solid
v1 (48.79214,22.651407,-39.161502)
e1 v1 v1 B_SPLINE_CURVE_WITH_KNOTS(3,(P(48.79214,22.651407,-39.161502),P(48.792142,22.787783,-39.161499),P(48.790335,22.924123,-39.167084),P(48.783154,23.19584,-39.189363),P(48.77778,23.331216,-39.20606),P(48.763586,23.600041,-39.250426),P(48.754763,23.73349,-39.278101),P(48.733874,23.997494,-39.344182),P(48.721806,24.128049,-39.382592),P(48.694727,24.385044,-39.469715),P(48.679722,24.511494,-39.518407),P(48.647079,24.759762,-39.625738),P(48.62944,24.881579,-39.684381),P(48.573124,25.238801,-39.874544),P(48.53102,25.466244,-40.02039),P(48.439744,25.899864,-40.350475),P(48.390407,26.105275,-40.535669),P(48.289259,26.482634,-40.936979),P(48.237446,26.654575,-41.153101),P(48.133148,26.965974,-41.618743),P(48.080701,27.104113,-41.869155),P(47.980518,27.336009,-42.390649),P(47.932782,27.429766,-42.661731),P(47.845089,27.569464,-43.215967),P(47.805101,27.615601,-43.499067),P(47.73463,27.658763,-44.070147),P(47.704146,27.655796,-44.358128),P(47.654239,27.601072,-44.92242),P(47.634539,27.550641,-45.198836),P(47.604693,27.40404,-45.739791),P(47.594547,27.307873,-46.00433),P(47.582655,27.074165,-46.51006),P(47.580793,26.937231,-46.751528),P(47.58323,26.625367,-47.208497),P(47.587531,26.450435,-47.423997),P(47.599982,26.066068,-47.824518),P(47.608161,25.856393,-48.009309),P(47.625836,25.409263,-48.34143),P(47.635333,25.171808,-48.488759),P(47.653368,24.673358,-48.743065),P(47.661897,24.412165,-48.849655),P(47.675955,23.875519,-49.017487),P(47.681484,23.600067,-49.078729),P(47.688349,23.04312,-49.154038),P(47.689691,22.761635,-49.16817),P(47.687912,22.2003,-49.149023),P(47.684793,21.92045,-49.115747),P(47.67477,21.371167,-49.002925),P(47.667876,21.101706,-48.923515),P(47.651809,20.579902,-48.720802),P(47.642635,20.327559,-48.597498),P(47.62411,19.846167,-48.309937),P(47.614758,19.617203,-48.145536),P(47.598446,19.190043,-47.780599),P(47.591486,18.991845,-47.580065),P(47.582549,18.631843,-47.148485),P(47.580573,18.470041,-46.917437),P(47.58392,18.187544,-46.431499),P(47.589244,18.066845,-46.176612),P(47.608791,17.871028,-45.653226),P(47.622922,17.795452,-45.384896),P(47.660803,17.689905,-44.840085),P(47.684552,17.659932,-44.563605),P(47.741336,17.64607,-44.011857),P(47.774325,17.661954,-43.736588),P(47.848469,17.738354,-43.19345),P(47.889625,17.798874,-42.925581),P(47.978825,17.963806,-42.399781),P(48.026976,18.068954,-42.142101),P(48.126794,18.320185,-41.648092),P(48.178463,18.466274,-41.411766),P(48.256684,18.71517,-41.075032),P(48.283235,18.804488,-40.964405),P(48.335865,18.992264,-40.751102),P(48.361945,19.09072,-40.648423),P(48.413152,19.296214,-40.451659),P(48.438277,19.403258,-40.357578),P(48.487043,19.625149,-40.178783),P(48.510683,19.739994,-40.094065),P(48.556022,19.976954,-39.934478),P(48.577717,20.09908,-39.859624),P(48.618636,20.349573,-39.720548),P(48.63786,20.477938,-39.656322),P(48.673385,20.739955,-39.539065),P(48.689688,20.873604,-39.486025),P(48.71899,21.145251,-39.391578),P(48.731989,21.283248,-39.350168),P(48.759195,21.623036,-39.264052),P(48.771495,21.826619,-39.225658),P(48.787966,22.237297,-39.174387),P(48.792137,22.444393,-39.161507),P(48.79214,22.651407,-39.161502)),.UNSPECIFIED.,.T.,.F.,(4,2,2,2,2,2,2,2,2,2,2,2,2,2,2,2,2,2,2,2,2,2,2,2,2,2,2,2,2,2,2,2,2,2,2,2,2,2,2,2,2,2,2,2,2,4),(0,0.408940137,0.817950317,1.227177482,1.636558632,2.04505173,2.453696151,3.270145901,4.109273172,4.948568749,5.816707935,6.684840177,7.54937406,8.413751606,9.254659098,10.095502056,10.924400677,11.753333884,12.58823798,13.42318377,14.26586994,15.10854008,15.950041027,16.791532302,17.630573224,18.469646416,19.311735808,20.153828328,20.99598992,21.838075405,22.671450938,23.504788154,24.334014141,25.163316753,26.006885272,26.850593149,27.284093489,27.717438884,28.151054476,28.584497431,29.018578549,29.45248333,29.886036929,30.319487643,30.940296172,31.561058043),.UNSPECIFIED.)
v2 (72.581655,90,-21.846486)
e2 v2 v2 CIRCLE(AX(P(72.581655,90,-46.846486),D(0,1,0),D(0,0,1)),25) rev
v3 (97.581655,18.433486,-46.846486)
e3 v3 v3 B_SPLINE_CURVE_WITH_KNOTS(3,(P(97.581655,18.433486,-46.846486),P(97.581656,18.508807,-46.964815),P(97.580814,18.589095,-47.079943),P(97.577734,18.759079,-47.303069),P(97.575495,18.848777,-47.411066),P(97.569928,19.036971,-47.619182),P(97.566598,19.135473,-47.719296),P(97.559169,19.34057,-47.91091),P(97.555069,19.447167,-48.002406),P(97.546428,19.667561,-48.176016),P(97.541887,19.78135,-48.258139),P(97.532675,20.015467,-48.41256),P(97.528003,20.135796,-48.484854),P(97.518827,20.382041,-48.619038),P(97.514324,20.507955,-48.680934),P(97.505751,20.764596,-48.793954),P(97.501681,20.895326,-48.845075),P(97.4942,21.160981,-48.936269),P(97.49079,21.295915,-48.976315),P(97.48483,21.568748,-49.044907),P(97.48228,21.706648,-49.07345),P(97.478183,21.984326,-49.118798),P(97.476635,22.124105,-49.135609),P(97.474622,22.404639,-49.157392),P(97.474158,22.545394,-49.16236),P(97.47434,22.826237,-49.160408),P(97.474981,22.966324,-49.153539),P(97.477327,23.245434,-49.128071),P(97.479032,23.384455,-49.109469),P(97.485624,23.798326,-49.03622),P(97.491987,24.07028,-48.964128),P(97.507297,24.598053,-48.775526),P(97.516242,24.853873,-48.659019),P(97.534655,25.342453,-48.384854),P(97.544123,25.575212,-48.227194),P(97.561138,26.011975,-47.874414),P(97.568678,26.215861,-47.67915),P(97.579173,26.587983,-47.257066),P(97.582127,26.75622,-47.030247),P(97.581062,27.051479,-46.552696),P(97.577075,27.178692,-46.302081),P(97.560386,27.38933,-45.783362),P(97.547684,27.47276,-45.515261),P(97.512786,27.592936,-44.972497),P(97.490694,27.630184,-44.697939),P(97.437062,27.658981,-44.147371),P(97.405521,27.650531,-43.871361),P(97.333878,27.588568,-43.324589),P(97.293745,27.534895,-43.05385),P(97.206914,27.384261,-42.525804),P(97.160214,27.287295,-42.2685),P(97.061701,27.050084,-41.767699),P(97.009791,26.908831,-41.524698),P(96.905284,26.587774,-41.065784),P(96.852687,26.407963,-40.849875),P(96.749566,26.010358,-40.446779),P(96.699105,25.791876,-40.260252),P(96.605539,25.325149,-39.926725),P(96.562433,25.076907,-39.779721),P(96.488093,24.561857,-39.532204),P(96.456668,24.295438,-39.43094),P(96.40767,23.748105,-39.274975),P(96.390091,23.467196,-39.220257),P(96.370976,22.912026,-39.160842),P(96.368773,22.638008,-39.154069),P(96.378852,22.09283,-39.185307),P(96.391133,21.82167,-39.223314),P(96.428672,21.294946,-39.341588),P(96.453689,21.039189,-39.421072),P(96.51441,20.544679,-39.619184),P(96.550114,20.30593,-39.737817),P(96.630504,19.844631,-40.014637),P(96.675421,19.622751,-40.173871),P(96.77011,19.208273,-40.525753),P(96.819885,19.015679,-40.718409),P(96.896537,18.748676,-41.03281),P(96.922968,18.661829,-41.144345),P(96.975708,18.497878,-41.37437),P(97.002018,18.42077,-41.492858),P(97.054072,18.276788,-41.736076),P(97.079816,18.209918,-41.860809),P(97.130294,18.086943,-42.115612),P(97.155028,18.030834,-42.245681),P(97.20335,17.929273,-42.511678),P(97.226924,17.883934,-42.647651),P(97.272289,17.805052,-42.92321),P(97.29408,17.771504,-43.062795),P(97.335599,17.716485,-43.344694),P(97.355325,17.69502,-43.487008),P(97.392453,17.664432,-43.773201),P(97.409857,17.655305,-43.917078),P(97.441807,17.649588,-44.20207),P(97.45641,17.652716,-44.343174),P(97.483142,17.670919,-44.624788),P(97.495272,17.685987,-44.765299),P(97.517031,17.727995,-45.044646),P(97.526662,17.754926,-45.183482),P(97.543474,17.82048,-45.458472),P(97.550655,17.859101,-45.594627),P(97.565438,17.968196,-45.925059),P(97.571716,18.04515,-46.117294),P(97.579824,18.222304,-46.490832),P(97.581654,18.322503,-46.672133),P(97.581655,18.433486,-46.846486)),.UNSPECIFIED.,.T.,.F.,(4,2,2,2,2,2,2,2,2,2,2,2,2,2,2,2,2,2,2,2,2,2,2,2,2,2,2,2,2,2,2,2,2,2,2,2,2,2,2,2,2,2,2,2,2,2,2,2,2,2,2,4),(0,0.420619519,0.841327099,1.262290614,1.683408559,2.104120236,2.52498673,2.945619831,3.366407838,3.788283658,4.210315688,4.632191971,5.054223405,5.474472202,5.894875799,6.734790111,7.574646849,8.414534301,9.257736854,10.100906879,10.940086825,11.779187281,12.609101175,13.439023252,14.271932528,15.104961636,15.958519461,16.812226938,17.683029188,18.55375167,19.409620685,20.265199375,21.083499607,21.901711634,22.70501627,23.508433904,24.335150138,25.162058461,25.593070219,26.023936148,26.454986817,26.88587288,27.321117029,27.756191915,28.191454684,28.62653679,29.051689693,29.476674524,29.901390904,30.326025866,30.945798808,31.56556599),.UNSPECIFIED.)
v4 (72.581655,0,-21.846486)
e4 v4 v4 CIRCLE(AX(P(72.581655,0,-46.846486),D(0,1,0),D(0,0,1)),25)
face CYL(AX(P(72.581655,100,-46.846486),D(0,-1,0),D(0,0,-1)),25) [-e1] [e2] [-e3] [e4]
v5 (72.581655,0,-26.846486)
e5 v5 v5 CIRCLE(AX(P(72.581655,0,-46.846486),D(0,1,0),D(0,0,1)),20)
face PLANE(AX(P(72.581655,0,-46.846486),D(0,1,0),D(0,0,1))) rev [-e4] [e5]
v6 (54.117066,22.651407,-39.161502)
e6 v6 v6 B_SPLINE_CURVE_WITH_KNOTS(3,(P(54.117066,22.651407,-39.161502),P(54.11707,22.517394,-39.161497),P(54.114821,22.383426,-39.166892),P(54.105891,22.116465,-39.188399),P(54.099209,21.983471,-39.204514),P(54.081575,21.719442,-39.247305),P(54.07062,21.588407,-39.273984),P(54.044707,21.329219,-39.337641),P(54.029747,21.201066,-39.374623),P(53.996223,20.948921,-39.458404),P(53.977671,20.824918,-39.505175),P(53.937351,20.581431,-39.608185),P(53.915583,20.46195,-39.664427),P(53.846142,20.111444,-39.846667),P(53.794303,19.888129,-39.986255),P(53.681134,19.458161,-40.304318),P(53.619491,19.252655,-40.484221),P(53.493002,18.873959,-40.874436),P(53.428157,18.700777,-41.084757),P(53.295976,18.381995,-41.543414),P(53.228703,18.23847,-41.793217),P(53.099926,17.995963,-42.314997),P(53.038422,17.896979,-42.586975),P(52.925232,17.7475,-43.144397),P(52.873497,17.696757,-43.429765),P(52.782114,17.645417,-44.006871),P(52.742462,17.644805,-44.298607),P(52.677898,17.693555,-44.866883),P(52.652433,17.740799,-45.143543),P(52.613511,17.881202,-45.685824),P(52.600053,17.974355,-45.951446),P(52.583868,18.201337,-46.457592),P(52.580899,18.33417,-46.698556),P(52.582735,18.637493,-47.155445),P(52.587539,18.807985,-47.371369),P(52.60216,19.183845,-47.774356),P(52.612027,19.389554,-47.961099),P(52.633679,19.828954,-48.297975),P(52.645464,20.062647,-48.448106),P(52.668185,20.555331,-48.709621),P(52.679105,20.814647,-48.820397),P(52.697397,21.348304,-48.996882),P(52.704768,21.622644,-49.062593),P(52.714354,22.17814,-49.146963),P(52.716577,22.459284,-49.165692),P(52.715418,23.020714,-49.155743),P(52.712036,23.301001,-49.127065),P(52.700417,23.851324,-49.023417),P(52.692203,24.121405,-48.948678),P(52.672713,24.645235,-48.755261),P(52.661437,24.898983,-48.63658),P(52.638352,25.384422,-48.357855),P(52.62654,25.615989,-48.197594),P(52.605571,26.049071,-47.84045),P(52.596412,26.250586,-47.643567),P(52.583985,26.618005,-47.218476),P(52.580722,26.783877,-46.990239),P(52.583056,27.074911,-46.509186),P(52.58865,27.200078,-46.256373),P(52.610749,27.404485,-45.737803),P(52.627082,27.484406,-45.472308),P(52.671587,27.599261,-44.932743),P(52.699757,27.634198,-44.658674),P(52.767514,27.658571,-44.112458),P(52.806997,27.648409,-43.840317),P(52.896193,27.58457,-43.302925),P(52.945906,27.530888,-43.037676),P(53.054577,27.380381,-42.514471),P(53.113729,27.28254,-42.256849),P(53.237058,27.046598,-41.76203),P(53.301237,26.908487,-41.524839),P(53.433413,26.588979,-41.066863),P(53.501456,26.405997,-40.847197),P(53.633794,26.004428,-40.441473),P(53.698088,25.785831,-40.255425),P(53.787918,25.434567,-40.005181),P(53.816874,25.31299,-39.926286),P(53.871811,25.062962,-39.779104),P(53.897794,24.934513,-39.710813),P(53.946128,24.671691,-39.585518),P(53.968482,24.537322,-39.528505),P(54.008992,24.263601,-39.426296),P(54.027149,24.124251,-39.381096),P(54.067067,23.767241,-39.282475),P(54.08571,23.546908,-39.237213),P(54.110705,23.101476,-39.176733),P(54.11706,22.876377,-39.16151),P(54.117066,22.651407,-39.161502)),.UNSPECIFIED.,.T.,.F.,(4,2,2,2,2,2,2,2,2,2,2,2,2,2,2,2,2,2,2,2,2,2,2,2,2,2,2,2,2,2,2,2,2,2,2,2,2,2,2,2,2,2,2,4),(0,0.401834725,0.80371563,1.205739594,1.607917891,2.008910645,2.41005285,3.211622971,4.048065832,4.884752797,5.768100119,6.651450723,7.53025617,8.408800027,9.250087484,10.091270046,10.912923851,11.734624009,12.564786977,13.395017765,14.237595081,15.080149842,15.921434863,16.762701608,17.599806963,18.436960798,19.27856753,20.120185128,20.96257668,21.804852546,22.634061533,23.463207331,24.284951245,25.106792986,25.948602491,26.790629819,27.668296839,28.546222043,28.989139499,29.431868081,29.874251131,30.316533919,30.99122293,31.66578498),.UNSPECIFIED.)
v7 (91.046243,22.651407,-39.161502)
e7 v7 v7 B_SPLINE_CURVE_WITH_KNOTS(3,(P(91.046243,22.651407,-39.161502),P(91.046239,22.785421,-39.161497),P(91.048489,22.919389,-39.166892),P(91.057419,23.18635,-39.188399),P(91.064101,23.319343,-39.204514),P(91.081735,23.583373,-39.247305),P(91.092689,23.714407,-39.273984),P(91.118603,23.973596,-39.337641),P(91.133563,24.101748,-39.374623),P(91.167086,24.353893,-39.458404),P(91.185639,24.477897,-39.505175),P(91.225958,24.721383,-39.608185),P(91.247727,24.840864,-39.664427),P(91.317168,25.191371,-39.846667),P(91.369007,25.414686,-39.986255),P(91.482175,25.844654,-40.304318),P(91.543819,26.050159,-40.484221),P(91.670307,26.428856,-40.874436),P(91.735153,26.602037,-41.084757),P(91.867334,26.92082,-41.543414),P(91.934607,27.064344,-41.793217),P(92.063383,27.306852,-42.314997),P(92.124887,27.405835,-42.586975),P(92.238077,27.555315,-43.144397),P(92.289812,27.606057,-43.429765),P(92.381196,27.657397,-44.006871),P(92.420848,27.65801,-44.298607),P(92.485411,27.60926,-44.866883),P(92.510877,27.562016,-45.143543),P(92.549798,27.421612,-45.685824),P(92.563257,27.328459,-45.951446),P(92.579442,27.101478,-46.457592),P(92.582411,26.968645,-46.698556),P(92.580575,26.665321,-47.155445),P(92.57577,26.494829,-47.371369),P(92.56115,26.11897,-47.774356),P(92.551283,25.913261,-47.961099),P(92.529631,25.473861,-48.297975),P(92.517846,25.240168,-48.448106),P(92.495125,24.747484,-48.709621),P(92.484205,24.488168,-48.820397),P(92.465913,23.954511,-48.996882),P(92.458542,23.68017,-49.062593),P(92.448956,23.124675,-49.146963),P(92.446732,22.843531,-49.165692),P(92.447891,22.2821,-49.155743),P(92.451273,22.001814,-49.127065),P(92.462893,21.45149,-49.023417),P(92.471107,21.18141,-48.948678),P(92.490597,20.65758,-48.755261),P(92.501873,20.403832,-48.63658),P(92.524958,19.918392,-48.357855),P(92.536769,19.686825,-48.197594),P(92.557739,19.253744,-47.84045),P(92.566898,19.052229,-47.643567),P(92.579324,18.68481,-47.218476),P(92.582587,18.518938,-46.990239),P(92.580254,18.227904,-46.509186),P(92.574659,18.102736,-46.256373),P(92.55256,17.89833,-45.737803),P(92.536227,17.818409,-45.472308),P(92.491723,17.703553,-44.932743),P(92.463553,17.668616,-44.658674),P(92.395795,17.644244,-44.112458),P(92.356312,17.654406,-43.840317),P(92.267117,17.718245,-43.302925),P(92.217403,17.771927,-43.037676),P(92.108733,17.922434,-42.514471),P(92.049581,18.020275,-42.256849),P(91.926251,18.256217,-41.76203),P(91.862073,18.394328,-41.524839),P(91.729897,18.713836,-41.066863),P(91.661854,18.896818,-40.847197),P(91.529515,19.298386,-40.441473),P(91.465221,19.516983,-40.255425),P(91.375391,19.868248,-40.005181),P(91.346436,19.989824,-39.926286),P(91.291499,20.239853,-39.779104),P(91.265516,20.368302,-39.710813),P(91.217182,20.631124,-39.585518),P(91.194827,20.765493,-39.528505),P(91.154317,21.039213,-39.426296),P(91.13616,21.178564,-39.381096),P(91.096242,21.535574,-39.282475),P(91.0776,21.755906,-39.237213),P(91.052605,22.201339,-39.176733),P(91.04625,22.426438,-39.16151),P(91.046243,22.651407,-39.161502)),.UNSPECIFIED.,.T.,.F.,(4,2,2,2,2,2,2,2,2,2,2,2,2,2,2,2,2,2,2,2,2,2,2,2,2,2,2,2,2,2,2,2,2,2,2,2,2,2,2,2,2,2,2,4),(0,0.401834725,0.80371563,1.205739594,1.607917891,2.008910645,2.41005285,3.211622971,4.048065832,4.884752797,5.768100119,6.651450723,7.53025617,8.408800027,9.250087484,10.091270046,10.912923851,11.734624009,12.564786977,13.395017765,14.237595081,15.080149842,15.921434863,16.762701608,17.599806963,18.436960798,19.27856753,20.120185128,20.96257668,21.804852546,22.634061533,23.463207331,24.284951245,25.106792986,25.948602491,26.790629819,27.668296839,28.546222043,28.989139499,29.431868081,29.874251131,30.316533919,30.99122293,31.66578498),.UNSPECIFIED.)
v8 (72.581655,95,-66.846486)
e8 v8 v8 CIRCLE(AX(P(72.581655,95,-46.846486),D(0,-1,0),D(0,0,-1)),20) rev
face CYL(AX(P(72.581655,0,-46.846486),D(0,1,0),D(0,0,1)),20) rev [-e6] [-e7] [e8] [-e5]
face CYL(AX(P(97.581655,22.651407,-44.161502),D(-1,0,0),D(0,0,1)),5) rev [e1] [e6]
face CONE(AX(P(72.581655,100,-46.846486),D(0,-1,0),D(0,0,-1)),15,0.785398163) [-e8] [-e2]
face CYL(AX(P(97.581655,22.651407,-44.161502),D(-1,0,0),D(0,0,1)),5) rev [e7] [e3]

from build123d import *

# Parameters (mm, degrees)
SKETCH2_R           = 25
BOSS_EXTRUDE2_DEPTH = 100
SKETCH3_R           = 20
CUT_EXTRUDE1_DEPTH  = 158.111733872
CHAMFER2_SIZE       = 10
SKETCH4_R           = 5
CUT_EXTRUDE3_DEPTH  = 154.977585945


with BuildPart() as part:
    # Sketch2 → Boss-Extrude2 (new body)
    with BuildSketch(Plane(origin=(0, 0, 0), x_dir=(1, 0, 0), z_dir=(0, 1, 0))):
        with Locations(Location((72.581654817, 46.846486091, 0), (0, 0, 270))):
            Circle(SKETCH2_R)
    extrude(amount=BOSS_EXTRUDE2_DEPTH)

    # Sketch3 → Cut-Extrude1 (cut, through all)
    with BuildSketch(Plane(origin=(0, 100, 0), x_dir=(1, 0, 0), z_dir=(0, 1, 0))):
        with Locations(Location((72.581654817, 46.846486091, 0), (0, 0, 270))):
            Circle(SKETCH3_R)
    extrude(amount=-CUT_EXTRUDE1_DEPTH, mode=Mode.SUBTRACT)

    # Chamfer2
    # the kernel refuses this chamfer: 10 mm, written as the material it takes off along each edge
    with BuildSketch(Plane(origin=(72.581654817, 100, -46.846486091), x_dir=(0, 0, 1), z_dir=(-1, 0, 0))) as chamfer2_piece_1:
        Polygon((25, -CHAMFER2_SIZE), (25 - CHAMFER2_SIZE, 0), (25, 0), align=None)
    revolve(axis=Axis((72.581654817, 100, -46.846486091), (0, 1, 0)), mode=Mode.SUBTRACT)

    # Sketch4 → Cut-Extrude3 (cut, through all)
    with BuildSketch(Plane(origin=(0, 0, 0), x_dir=(0, 0, -1), z_dir=(1, 0, 0))):
        with Locations(Location((44.161502289, 22.651407336, 0), (0, 0, 180))):
            Circle(SKETCH4_R)
    extrude(amount=CUT_EXTRUDE3_DEPTH, mode=Mode.SUBTRACT)


solid = part.part
